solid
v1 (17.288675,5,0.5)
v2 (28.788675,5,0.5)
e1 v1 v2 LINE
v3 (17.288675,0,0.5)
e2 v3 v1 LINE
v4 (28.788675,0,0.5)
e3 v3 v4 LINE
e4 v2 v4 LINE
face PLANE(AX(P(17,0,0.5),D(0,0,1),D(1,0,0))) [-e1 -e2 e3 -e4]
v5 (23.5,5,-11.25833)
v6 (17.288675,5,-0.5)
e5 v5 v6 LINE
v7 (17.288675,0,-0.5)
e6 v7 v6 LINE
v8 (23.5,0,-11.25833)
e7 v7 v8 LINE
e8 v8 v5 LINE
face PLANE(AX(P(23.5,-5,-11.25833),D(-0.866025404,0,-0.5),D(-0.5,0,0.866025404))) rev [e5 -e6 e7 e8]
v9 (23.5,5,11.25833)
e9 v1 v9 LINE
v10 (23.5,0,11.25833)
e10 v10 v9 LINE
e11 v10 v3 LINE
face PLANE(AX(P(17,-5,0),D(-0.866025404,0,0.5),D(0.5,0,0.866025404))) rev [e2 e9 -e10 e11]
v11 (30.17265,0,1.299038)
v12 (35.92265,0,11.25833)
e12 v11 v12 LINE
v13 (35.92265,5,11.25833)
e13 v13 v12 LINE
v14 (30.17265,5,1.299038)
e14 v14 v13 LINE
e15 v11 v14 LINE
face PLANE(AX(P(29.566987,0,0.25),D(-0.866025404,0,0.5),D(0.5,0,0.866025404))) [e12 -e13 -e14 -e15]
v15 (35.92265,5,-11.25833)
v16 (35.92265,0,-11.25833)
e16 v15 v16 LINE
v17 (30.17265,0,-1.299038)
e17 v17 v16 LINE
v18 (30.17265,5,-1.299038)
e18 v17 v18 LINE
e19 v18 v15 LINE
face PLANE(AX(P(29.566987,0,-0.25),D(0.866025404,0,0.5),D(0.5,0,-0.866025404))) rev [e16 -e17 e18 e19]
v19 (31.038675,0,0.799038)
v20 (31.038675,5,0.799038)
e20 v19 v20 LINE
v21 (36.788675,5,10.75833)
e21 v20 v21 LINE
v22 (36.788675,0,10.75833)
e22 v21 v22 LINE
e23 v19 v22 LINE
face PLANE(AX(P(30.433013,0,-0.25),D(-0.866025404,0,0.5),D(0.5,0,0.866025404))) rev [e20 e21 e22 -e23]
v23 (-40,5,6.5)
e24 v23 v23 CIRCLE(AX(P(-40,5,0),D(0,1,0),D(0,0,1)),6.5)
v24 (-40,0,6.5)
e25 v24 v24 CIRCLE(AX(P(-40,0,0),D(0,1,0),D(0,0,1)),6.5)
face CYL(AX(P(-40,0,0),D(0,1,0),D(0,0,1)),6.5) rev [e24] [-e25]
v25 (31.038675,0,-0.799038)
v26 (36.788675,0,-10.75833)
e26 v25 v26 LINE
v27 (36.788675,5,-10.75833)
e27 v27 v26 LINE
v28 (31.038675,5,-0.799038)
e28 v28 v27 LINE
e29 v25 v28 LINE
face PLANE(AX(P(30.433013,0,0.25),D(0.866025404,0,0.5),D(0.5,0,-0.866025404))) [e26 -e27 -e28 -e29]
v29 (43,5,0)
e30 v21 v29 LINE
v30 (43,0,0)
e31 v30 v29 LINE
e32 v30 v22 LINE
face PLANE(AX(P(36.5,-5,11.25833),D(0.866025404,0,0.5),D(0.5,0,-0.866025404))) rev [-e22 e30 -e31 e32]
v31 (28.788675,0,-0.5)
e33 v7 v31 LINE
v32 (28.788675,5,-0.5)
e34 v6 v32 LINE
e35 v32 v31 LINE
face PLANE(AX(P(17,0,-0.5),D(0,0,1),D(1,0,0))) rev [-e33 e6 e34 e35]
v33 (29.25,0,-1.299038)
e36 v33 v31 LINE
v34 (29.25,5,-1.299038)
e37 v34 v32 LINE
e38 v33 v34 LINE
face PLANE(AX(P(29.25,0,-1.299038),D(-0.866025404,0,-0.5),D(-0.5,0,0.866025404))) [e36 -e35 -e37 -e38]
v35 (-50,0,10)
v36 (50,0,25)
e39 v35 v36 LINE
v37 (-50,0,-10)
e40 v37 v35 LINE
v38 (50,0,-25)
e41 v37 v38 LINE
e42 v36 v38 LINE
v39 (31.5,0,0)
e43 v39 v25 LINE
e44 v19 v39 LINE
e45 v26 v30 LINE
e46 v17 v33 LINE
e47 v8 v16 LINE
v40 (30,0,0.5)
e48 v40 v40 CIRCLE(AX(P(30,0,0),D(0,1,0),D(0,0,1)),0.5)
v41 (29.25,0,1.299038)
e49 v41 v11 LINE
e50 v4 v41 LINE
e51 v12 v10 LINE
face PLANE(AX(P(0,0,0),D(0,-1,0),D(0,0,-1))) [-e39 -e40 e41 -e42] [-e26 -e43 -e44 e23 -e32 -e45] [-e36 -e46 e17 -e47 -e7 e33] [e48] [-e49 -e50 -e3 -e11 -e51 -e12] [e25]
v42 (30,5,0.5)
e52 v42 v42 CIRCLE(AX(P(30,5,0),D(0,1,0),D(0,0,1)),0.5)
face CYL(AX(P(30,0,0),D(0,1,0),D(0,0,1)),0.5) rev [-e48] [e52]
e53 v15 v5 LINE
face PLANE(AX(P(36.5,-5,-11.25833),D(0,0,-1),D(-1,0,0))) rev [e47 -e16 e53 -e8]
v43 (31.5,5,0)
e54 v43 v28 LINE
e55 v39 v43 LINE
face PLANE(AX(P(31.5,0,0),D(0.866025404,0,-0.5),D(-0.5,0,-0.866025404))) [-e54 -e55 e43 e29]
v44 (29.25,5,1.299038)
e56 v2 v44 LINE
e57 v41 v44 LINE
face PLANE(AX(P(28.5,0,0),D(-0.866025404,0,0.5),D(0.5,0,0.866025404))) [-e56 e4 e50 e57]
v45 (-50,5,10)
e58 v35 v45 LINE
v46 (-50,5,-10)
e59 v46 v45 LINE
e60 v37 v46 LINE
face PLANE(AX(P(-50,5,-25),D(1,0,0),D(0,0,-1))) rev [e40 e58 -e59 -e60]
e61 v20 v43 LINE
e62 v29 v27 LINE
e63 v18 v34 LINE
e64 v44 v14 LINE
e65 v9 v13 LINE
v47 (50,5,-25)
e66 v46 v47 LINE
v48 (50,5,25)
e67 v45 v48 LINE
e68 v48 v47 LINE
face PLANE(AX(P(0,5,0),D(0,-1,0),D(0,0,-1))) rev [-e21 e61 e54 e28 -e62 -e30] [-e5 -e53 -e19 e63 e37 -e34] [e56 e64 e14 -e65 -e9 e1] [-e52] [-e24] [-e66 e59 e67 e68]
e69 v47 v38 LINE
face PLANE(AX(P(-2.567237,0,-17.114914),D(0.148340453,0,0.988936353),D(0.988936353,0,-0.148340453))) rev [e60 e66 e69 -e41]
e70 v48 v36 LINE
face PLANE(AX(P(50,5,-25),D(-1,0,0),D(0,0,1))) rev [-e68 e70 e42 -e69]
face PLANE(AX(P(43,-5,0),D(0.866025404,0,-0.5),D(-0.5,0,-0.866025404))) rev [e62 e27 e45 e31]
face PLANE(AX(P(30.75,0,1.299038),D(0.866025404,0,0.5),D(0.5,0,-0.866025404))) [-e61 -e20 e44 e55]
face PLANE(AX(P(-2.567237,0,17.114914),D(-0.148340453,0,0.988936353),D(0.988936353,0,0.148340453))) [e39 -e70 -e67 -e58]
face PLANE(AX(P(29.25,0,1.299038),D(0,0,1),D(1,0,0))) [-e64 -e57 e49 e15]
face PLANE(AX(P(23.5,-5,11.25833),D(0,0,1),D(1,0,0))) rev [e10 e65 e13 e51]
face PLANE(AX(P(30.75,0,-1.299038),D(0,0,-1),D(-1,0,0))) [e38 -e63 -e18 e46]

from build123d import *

# Parameters (mm, degrees)
SKETCH1_W           = 100
SKETCH1_H           = 50
BOSS_EXTRUDE1_DEPTH = 5
CUT_EXTRUDE1_DEPTH  = 10
CUT_EXTRUDE2_DEPTH  = 57.124860802
EXTRUDE_THIN2_START = -5
EXTRUDE_THIN2_DEPTH = 5
BOSS_EXTRUDE3_DEPTH = 5
SKETCH7_R           = 6.5
CUT_EXTRUDE3_DEPTH  = 57.124860802
SKETCH8_R           = 0.5
CUT_EXTRUDE4_DEPTH  = 57.124860802


# Read off the part's stored shape, not the designer's step: Extrude-Thin2
with BuildPart() as part:
    # Sketch1 → Boss-Extrude1 (new body)
    with BuildSketch(Plane(origin=(0, 0, 0), x_dir=(1, 0, 0), z_dir=(0, 1, 0))):
        Rectangle(SKETCH1_W, SKETCH1_H)
    extrude(amount=BOSS_EXTRUDE1_DEPTH)

    # Sketch2 → Cut-Extrude1 (cut)
    with BuildSketch(Plane(origin=(0, 5, 0), x_dir=(1, 0, 0), z_dir=(0, 1, 0))):
        Polygon((23.5, -11.258330249), (36.5, -11.258330249), (43, 0), (36.5, 11.258330249), (23.5, 11.258330249), (17, 0), align=None)
    extrude(amount=-CUT_EXTRUDE1_DEPTH, mode=Mode.SUBTRACT)

    # Sketch3 → Cut-Extrude2 (cut, through all)
    with BuildSketch(Plane(origin=(0, 5, 0), x_dir=(1, 0, 0), z_dir=(0, 1, 0))):
        Polygon((50, -25), (-50, -10), (-50, -25), align=None)
    cut_extrude2 = extrude(amount=-CUT_EXTRUDE2_DEPTH, mode=Mode.SUBTRACT)

    # Mirror1: Cut-Extrude2 across plane
    add(cut_extrude2.mirror(Plane.XY), mode=Mode.SUBTRACT)

    # Extrude-Thin2 outline → Extrude-Thin2 (add)
    with BuildSketch(Plane(origin=(0, 5, 0), x_dir=(1, 0, 0), z_dir=(0, 1, 0)).offset(EXTRUDE_THIN2_START)):
        Polygon((17, 0), (17.288675135, -0.5), (29.711324865, -0.5), (35.922649731, -11.258330249), (36.5, -11.258330249), (36.788675135, -10.758330249), (30.577350269, 0), (36.788675135, 10.758330249), (36.5, 11.258330249), (35.922649731, 11.258330249), (29.711324865, 0.5), (17.288675135, 0.5), align=None)
    extrude(amount=EXTRUDE_THIN2_DEPTH)

    # Sketch6 → Boss-Extrude3 (add, through all)
    with BuildSketch(Plane(origin=(0, 5, 0), x_dir=(1, 0, 0), z_dir=(0, 1, 0))):
        Polygon((31.5, 0), (30.75, 1.299038106), (29.25, 1.299038106), (28.5, 0), (29.25, -1.299038106), (30.75, -1.299038106), align=None)
    extrude(amount=-BOSS_EXTRUDE3_DEPTH)

    # Sketch7 → Cut-Extrude3 (cut, through all)
    with BuildSketch(Plane(origin=(0, 5, 0), x_dir=(1, 0, 0), z_dir=(0, 1, 0))):
        with Locations(Location((-40, 0, 0), (0, 0, 270))):
            Circle(SKETCH7_R)
    extrude(amount=-CUT_EXTRUDE3_DEPTH, mode=Mode.SUBTRACT)

    # Sketch8 → Cut-Extrude4 (cut, through all)
    with BuildSketch(Plane(origin=(0, 5, 0), x_dir=(1, 0, 0), z_dir=(0, 1, 0))):
        with Locations(Location((30, 0, 0), (0, 0, 270))):
            Circle(SKETCH8_R)
    extrude(amount=-CUT_EXTRUDE4_DEPTH, mode=Mode.SUBTRACT)


solid = part.part
